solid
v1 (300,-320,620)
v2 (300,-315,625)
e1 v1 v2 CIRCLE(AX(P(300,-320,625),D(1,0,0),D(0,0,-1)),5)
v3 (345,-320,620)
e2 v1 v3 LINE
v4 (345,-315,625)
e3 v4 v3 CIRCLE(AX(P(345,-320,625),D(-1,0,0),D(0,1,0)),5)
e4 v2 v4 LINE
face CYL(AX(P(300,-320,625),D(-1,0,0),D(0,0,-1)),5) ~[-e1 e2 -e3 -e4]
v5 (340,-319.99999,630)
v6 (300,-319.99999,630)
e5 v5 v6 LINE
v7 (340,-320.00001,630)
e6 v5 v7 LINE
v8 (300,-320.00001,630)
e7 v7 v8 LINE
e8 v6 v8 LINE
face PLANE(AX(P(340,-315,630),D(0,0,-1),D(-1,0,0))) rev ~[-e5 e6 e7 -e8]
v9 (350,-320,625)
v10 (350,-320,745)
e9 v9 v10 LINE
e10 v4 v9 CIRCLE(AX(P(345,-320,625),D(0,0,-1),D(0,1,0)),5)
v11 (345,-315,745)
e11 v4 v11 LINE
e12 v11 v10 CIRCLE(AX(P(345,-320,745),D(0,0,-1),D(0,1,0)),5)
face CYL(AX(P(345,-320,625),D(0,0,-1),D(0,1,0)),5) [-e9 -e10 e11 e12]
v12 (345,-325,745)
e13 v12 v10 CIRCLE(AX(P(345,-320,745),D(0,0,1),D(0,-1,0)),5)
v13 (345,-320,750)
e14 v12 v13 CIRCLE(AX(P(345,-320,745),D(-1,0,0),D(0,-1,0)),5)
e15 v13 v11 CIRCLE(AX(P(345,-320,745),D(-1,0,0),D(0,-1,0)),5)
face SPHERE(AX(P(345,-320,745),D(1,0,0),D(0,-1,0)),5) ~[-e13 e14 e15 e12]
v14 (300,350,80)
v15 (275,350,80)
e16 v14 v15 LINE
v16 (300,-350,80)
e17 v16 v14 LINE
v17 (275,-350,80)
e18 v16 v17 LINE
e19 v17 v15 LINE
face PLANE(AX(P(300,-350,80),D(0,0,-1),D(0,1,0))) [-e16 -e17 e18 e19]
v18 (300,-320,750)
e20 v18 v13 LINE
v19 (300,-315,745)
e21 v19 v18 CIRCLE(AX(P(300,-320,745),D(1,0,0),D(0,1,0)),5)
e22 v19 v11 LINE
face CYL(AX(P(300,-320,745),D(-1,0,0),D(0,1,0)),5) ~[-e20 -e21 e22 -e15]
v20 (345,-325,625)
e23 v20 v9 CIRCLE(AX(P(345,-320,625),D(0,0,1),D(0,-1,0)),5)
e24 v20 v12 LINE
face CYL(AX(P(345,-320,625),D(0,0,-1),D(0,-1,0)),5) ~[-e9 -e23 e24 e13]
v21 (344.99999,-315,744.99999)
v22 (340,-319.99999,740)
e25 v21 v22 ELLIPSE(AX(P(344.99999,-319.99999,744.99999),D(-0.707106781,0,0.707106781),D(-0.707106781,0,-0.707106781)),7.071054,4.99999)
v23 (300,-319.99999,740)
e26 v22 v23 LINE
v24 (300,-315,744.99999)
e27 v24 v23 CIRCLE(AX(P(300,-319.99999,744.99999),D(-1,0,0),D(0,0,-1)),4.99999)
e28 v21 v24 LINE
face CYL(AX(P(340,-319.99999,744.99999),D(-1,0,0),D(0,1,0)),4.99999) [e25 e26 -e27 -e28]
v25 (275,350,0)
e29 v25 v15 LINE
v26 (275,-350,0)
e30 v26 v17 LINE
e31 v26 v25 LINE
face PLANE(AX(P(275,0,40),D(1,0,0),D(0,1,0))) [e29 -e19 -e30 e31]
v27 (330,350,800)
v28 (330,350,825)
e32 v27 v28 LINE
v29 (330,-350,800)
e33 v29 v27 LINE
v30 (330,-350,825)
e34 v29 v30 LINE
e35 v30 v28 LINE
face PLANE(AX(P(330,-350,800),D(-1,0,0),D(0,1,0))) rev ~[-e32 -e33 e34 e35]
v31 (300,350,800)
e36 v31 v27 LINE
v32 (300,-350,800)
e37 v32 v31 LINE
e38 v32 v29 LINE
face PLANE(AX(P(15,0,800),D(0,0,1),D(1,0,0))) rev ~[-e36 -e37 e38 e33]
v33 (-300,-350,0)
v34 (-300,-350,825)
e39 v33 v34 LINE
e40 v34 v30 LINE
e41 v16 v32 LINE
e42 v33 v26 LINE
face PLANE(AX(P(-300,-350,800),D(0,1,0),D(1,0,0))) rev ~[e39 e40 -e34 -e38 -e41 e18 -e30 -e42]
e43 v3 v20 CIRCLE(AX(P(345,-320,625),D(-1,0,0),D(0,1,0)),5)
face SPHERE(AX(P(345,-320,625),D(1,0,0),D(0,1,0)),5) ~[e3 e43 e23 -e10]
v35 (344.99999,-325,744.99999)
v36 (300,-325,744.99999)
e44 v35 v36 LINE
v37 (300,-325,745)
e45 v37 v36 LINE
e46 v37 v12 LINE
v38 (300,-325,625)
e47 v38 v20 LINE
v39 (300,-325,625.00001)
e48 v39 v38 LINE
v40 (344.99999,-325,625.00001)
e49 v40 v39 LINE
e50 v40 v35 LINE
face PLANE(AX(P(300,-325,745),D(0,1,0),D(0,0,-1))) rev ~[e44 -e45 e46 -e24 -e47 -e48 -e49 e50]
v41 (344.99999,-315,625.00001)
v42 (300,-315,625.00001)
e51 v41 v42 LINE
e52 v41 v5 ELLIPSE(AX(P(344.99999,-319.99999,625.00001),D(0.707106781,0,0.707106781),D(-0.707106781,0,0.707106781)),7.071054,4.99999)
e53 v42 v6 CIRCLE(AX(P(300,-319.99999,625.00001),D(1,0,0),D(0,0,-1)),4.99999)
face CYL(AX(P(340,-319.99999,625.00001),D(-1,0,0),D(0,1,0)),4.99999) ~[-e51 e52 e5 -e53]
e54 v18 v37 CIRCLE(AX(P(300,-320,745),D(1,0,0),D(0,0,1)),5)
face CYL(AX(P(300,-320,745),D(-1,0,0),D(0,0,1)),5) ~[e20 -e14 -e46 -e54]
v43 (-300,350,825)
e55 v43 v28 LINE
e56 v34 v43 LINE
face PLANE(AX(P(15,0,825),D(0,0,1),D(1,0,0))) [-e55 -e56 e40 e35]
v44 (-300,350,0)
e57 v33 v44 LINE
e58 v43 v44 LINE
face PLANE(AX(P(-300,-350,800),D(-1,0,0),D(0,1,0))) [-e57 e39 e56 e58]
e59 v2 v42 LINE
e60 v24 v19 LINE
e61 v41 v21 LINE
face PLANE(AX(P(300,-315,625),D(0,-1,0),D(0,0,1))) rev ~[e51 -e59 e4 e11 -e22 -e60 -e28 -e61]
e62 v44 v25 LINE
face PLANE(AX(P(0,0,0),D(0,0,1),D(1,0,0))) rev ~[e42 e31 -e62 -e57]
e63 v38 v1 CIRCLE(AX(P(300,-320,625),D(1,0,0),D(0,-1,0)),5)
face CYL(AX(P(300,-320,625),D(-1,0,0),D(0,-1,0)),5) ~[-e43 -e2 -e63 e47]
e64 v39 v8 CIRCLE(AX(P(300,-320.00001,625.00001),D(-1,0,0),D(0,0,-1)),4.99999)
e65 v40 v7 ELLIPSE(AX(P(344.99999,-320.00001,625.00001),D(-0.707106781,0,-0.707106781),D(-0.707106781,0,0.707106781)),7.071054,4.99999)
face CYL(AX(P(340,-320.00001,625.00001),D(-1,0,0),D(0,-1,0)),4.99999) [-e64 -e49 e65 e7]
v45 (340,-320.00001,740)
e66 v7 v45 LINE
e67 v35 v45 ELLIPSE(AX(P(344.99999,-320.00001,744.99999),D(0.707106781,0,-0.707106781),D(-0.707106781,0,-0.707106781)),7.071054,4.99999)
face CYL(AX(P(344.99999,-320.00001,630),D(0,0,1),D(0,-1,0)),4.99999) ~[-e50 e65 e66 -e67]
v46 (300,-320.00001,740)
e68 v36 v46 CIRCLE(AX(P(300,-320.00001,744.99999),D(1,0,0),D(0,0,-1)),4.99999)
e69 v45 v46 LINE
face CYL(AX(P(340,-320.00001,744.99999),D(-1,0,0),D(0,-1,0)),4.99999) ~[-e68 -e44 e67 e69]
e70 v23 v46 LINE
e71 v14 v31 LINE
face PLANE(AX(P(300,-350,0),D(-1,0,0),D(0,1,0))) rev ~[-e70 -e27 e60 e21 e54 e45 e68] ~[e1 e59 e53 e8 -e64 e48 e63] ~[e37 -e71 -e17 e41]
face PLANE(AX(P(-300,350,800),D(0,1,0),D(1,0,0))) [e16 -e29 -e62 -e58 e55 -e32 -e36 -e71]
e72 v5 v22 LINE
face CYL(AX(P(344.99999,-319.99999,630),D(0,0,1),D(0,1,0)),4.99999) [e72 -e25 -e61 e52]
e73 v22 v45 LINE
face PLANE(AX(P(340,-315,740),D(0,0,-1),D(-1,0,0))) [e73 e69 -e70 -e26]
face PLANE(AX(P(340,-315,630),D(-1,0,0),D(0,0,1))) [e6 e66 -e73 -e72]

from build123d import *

# Parameters (mm, degrees)
F0_W        = 600
F0_H        = 700
F1_DEPTH    = 800
F2_W        = 700
F2_H        = 80
F3_DEPTH    = 25
F5_DEPTH    = 50
F6_T1_DEPTH = 120
F6_T4_ANGLE = 180
F6_T6_ANGLE = 180
F7_W        = 40
F7_H        = 110
F8_DEPTH    = 25
F9_R        = 4.99999
F10_W       = 630
F10_H       = 700
F11_DEPTH   = 25


# Not quite as in the source:
# - a fillet or chamfer that OpenCascade refuses, or shapes differently, is made with other operations: its cross-section is extruded or revolved along the edge and cut away or added
# - a fillet or chamfer is up to 0.001 mm smaller than in the source, because OpenCascade refuses the exact size


with BuildPart() as f1:
    # F0 (on Top) → F1 (new body)
    with BuildSketch(Plane.XY):
        Rectangle(F0_W, F0_H)
    extrude(amount=F1_DEPTH)

    # F2 (on face) → F3 (cut)
    with BuildSketch(Plane.YZ.offset(300)):
        with Locations((0, 40)):
            Rectangle(F2_W, F2_H)
    extrude(amount=-F3_DEPTH, mode=Mode.SUBTRACT)

    # F4 (on face) → F5 (join)
    with BuildSketch(Plane.YZ.offset(300)):
        with BuildLine():
            ThreePointArc((-320, 750), (-323.5355339059, 748.5355339059), (-325, 745))
            Line((-325, 745), (-325, 625))
            ThreePointArc((-325, 625), (-323.5355339059, 621.4644660941), (-320, 620))
            ThreePointArc((-320, 620), (-316.4644660941, 621.4644660941), (-315, 625))
            Line((-315, 625), (-315, 745))
            ThreePointArc((-315, 745), (-316.4644660941, 748.5355339059), (-320, 750))
        make_face()
    extrude(amount=F5_DEPTH)

    # F6: fillet of radius 5 on 4 edges, made by hand

    # F6_s2 → F6_t1 (cut)
    with BuildSketch(Plane.XY.offset(625)):
        with BuildLine():
            ThreePointArc((345, -325), (348.5355339059, -323.5355339059), (350, -320))
            Line((350, -320), (350, -325))
            Line((350, -325), (345, -325))
        make_face()
        with BuildLine():
            ThreePointArc((345, -315), (348.5355339059, -316.4644660941), (350, -320))
            Line((350, -320), (350, -315))
            Line((350, -315), (345, -315))
        make_face()
    extrude(amount=F6_T1_DEPTH, mode=Mode.SUBTRACT)

    # F6_s3 → F6_t4 (revolve, cut)
    with BuildSketch(Plane.XY.offset(745)):
        with BuildLine():
            ThreePointArc((345, -325), (348.5355339059, -323.5355339059), (350, -320))
            Line((350, -320), (350, -325))
            Line((350, -325), (345, -325))
        make_face()
    revolve(axis=Axis((350, -320, 745), (-1, 0, 0)), revolution_arc=F6_T4_ANGLE, mode=Mode.SUBTRACT)

    # F6_s5 → F6_t6 (revolve, cut)
    with BuildSketch(Plane.XY.offset(625)):
        with BuildLine():
            ThreePointArc((345, -315), (348.5355339059, -316.4644660941), (350, -320))
            Line((350, -320), (350, -315))
            Line((350, -315), (345, -315))
        make_face()
    revolve(axis=Axis((350, -320, 625), (-1, 0, 0)), revolution_arc=F6_T6_ANGLE, mode=Mode.SUBTRACT)

    # F7 (on face) → F8 (cut)
    with BuildSketch(Plane(origin=(0, -315, 0), x_dir=(-1, 0, 0), z_dir=(0, 1, 0))):
        with Locations((-320, 685)):
            Rectangle(F7_W, F7_H)
    extrude(amount=-F8_DEPTH, mode=Mode.SUBTRACT)

    # F9 (radius 5 in the source; OpenCascade refuses exactly that, so slightly less here)
    f9_edges = [f1.edges().sort_by_distance(p)[0] for p in [
        (320, -315, 740),
        (340, -315, 685),
        (320, -315, 630),
        (320, -325, 740),
        (340, -325, 685),
        (320, -325, 630),
    ]]
    fillet(f9_edges, radius=F9_R)

    # F10 (on face) → F11 (join)
    with BuildSketch(Plane.XY.offset(800)):
        with Locations((15, 0)):
            Rectangle(F10_W, F10_H)
    extrude(amount=F11_DEPTH)


solid = f1.part
